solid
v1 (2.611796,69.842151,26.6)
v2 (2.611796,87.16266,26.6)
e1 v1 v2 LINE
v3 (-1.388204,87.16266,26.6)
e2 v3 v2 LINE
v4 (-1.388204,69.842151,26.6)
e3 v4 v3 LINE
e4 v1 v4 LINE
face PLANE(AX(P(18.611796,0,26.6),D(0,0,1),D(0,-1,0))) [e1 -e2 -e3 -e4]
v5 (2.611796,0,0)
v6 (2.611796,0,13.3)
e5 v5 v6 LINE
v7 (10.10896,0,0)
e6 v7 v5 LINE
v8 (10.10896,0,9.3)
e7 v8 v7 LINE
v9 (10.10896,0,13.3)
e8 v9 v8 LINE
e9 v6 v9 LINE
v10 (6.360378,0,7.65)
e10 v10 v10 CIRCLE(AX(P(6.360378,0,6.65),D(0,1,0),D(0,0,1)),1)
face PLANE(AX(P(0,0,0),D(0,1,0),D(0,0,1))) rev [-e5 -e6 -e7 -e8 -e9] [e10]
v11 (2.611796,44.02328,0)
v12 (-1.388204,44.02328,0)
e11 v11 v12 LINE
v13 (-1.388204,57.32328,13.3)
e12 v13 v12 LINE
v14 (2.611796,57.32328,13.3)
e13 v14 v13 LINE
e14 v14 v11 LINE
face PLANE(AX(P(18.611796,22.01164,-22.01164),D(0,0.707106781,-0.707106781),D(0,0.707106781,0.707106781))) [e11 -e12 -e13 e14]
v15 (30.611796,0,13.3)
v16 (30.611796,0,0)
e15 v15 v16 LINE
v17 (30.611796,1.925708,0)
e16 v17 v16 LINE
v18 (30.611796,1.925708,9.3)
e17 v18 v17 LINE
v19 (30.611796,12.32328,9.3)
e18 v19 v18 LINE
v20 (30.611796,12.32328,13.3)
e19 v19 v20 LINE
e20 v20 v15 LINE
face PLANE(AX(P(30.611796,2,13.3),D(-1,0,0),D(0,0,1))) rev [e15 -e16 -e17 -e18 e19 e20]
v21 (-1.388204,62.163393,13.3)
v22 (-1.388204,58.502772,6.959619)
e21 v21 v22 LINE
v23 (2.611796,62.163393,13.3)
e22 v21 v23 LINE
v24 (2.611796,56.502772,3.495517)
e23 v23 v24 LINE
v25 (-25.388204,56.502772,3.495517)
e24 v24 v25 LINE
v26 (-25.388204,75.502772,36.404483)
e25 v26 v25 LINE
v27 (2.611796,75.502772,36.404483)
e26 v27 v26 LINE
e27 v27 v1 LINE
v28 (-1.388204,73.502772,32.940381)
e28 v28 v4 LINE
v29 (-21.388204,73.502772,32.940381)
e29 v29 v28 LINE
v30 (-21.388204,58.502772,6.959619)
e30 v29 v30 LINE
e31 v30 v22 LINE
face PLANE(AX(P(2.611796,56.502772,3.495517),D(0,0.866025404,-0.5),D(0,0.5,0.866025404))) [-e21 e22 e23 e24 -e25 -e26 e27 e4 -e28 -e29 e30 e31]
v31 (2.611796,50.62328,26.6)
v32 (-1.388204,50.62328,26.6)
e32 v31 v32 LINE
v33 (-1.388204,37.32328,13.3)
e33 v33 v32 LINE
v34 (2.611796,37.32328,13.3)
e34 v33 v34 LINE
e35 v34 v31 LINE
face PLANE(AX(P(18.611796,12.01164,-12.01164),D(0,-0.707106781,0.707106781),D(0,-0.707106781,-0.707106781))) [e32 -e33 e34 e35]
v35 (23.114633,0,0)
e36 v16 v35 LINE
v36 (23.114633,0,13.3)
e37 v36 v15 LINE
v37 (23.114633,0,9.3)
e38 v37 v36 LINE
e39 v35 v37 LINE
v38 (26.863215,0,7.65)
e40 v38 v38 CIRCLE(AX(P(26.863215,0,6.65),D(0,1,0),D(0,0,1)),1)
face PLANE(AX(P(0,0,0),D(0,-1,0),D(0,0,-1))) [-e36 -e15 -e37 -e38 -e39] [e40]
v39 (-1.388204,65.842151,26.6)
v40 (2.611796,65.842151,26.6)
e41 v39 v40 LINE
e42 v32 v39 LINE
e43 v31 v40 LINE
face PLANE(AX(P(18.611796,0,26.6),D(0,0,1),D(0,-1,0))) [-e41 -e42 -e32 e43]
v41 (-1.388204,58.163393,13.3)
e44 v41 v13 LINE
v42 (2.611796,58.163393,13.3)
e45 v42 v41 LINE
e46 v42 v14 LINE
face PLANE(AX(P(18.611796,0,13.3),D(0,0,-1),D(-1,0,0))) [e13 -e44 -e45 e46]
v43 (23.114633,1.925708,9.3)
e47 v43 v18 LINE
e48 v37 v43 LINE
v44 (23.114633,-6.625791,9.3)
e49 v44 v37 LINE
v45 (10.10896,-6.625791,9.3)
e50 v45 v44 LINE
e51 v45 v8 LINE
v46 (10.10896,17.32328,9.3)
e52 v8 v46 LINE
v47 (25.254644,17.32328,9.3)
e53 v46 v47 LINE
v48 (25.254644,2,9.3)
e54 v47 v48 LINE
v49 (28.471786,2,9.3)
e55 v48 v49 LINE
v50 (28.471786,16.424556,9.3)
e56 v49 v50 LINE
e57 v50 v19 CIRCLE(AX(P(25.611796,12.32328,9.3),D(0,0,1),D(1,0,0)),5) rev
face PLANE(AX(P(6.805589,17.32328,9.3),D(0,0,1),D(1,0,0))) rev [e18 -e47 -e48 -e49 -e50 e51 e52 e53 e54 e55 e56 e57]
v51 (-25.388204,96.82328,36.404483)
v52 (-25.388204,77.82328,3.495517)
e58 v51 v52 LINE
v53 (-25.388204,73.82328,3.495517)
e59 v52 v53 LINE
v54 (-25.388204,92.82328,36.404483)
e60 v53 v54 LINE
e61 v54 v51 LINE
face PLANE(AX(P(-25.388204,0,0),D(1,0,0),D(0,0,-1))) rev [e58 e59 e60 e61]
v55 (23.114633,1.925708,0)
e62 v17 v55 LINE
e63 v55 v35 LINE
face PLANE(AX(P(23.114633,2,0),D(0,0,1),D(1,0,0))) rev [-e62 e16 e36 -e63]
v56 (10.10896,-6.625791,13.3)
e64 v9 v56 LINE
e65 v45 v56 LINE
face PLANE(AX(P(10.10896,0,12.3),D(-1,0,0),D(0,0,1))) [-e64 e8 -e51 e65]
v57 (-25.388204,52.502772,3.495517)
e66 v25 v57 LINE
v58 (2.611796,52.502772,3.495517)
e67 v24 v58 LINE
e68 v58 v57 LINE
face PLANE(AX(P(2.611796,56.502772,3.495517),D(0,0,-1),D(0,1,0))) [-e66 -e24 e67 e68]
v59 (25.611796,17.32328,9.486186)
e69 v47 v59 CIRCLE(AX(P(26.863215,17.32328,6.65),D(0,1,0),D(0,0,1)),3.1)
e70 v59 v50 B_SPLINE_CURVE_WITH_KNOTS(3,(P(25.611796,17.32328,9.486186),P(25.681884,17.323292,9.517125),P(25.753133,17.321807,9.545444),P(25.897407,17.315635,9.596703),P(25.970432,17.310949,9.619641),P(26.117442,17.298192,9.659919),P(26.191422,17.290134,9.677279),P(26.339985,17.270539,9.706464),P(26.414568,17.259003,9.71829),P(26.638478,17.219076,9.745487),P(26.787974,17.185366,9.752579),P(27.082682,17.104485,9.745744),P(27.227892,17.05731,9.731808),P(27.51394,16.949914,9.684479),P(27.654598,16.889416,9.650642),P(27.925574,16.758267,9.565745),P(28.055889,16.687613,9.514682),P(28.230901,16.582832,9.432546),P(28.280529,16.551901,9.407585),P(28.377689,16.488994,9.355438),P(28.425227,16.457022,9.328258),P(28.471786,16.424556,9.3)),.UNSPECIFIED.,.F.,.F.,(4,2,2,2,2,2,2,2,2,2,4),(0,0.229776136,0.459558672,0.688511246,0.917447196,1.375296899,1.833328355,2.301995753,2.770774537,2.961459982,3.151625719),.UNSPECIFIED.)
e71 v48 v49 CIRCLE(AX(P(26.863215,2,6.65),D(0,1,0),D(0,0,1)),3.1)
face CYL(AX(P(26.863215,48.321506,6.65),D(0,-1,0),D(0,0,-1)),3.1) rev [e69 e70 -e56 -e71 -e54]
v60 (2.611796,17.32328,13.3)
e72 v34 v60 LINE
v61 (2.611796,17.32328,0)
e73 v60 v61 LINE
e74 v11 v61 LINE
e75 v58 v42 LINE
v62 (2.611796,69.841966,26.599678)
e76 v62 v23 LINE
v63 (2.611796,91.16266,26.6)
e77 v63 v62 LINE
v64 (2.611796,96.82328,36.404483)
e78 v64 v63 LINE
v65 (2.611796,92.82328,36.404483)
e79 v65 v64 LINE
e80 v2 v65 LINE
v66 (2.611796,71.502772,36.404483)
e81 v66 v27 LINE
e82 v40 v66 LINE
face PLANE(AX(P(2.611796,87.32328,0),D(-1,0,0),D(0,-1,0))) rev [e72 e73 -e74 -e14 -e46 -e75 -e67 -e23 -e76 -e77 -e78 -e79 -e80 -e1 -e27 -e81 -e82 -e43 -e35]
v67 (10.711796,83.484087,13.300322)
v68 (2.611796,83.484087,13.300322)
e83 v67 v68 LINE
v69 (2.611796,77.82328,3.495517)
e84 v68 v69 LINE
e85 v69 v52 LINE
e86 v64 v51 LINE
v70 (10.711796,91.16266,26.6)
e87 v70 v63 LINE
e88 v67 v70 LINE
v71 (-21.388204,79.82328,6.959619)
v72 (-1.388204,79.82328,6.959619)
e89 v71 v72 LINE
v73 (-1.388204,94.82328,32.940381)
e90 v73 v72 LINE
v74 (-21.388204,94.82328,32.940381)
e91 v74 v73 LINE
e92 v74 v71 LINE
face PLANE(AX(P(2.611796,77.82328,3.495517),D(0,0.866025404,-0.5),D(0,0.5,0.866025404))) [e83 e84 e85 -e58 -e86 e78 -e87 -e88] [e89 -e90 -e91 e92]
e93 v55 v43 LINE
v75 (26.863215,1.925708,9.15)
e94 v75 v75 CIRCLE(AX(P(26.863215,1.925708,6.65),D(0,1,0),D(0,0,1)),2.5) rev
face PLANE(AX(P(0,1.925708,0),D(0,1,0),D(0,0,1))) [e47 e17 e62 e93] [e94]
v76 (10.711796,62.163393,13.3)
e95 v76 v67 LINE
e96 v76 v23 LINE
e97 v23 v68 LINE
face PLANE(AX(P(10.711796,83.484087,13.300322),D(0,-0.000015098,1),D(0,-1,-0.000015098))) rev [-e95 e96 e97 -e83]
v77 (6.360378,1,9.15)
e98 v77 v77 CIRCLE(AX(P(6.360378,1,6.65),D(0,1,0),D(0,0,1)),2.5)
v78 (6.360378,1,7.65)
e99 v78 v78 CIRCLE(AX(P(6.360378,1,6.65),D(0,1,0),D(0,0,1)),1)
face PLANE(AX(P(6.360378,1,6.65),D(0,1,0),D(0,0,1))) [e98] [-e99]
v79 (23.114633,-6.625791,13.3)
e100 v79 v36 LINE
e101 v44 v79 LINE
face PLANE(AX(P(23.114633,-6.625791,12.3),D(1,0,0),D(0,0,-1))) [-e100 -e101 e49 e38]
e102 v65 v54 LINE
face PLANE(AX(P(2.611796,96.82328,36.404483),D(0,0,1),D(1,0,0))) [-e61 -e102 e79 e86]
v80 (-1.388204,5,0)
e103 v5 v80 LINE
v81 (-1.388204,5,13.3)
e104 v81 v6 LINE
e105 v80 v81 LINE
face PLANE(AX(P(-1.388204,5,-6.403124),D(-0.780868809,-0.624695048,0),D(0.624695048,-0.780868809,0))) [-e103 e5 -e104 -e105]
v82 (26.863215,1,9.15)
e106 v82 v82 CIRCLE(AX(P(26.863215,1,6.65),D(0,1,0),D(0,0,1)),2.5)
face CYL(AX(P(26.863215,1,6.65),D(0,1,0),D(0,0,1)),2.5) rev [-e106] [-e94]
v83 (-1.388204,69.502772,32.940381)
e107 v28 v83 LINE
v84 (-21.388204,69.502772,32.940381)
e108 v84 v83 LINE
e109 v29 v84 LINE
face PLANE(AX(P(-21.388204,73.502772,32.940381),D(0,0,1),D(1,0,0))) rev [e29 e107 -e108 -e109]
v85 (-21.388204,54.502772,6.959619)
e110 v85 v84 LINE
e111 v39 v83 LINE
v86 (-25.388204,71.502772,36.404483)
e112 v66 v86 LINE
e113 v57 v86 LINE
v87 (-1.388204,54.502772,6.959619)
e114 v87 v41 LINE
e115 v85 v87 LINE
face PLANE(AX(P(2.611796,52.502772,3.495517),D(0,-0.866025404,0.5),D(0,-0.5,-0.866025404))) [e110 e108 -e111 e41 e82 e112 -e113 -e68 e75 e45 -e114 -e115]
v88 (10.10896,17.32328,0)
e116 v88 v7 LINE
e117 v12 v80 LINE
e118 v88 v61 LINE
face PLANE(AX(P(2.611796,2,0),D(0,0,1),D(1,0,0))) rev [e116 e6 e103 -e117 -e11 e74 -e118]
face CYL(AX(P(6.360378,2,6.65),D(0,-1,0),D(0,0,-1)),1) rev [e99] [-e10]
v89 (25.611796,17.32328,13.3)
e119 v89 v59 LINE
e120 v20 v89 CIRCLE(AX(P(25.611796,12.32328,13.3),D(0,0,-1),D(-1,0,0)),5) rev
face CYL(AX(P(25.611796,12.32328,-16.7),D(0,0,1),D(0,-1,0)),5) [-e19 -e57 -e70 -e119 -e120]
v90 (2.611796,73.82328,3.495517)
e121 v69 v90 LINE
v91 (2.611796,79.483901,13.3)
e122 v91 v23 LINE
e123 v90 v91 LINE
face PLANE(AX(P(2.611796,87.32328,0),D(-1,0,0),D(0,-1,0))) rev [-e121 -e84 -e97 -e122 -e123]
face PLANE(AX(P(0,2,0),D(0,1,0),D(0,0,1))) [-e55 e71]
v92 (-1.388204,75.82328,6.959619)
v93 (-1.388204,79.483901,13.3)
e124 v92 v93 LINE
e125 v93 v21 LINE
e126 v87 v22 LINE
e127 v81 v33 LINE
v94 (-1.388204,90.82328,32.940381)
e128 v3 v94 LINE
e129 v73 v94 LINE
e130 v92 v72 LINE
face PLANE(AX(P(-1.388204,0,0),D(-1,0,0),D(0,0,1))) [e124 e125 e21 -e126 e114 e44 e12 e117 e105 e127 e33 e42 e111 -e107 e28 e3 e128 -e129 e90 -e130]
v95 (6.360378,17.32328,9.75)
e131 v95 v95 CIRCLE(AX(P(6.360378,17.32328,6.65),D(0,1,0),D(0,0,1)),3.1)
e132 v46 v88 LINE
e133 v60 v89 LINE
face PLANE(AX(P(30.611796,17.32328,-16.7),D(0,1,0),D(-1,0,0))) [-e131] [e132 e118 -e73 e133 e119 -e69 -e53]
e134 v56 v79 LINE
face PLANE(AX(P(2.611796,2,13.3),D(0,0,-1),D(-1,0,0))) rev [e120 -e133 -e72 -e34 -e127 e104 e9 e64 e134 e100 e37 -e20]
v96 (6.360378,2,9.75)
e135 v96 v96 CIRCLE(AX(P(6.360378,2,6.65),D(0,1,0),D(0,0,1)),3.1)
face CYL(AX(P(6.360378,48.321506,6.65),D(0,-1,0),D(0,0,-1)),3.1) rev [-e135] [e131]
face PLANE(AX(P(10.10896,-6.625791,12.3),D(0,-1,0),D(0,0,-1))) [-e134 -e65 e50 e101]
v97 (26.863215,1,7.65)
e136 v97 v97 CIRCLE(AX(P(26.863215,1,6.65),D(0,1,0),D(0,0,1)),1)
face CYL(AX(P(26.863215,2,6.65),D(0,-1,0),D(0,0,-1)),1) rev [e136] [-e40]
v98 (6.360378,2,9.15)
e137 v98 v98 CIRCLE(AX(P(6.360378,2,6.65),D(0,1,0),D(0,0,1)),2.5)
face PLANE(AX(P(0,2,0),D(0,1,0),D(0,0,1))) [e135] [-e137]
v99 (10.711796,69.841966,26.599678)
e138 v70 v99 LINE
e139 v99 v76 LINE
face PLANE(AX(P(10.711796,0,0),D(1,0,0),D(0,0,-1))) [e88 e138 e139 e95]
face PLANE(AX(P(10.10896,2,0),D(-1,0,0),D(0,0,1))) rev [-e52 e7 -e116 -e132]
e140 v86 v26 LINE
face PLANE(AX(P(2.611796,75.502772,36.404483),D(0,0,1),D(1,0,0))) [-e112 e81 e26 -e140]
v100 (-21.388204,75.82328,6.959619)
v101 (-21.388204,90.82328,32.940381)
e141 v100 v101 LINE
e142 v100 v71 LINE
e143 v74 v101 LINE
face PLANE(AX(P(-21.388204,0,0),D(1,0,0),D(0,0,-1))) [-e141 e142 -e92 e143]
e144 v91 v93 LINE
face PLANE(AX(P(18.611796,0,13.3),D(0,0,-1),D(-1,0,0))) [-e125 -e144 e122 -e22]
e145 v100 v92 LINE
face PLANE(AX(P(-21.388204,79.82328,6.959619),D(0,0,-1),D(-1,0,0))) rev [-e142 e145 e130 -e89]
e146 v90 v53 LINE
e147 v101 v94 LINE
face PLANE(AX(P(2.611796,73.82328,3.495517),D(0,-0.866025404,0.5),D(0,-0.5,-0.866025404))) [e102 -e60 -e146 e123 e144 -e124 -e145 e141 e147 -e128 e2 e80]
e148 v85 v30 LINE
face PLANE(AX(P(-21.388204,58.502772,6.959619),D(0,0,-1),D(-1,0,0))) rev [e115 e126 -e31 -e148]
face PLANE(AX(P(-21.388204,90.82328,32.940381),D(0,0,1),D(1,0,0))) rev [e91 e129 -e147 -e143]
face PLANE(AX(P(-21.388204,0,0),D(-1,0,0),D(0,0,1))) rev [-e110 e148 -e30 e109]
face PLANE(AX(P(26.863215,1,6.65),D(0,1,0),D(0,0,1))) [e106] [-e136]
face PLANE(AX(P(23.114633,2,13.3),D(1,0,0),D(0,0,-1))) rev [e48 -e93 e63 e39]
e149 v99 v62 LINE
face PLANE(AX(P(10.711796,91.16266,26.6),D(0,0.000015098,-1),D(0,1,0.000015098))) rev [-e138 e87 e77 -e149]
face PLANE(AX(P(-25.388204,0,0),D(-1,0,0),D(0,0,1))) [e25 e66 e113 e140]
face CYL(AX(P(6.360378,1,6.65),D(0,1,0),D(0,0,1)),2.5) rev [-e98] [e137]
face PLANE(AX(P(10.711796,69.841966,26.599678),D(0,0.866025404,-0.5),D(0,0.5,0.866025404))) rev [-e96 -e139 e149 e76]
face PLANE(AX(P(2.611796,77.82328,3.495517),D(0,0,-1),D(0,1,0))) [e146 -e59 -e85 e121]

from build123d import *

# Parameters (mm, degrees)
SKETCH1_W             = 7.497163216
SKETCH1_H             = 13.3
SKETCH1_R             = 1
BOSS_EXTRUDE1_DEPTH   = 2
BOSS_EXTRUDE1_2_DEPTH = 2
SKETCH3_R             = 2.5
CUT_EXTRUDE1_DEPTH    = 1
BOSS_EXTRUDE3_DEPTH   = 1
SKETCH5_R             = 3.1
BOSS_EXTRUDE4_DEPTH   = 15.323280282
CUT_EXTRUDE2_REACH    = 37.51
SKETCH6_W             = 9.3
SKETCH6_H             = 13.397572085
BOSS_EXTRUDE5_START   = -13.397572085
BOSS_EXTRUDE5_DEPTH   = 13.397572085
SKETCH8_W             = 13.005673568
SKETCH8_H             = 3
BOSS_EXTRUDE6_DEPTH   = 10.5515
SKETCH9_W             = 13.3
SKETCH9_H             = 12.323280282
BOSS_EXTRUDE7_DEPTH   = 4
SKETCH10_W            = 4
SKETCH10_H            = 13.3
BOSS_EXTRUDE8_DEPTH   = 70
BOSS_EXTRUDE9_DEPTH   = 13.3
SKETCH15_W            = 4
SKETCH15_H            = 20
BOSS_EXTRUDE13_DEPTH  = 20
SKETCH16_W            = 4
SKETCH16_H            = 20
BOSS_EXTRUDE14_DEPTH  = 30
CUT_EXTRUDE3_DEPTH    = 20
BOSS_EXTRUDE15_DEPTH  = 4
BOSS_EXTRUDE16_DEPTH  = 20
SKETCH21_W            = 7.497163216
SKETCH21_H            = 9.3
CUT_EXTRUDE4_DEPTH    = 2
BOSS_EXTRUDE18_DEPTH  = 4
CUT_EXTRUDE5_DEPTH    = 4
BOSS_EXTRUDE20_DEPTH  = 8.1
FILLET1_R             = 5


with BuildPart() as part:
    # Sketch1 → Boss-Extrude1 (new body)
    with BuildSketch(Plane(origin=(0, 0, 0), x_dir=(1, 0, 0), z_dir=(0, 1, 0))):
        with Locations((6.360378056, -6.65)):
            Rectangle(SKETCH1_W, SKETCH1_H)
        with Locations(Location((6.360378056, -6.65, 0), (0, 0, 270))):
            Circle(SKETCH1_R, mode=Mode.SUBTRACT)
    extrude(amount=BOSS_EXTRUDE1_DEPTH)


with BuildPart() as body_2:
    # Sketch1 → Boss-Extrude1 2 (new body)
    with BuildSketch(Plane(origin=(0, 0, 0), x_dir=(1, 0, 0), z_dir=(0, 1, 0))):
        with Locations((26.86321484, -6.65)):
            Rectangle(SKETCH1_W, SKETCH1_H)
        with Locations(Location((26.86321484, -6.65, 0), (0, 0, 270))):
            Circle(SKETCH1_R, mode=Mode.SUBTRACT)
    extrude(amount=BOSS_EXTRUDE1_2_DEPTH)


with BuildPart() as cut_extrude1_tool:
    # Sketch3 → Cut-Extrude1 (new body)
    with BuildSketch(Plane(origin=(0, 2, 0), x_dir=(1, 0, 0), z_dir=(0, 1, 0))):
        with Locations(Location((26.86321484, -6.65, 0), (0, 0, 270))):
            Circle(SKETCH3_R)
        with Locations(Location((6.360378056, -6.65, 0), (0, 0, 270))):
            Circle(SKETCH3_R)
    extrude(amount=-CUT_EXTRUDE1_DEPTH)


with BuildPart() as part_1:
    add(part.part)

    # Cut-Extrude1: cut by cut_extrude1_tool
    add(cut_extrude1_tool.part, mode=Mode.SUBTRACT)



with BuildPart() as body_2_1:
    add(body_2.part)

    # Cut-Extrude1: cut by cut_extrude1_tool
    add(cut_extrude1_tool.part, mode=Mode.SUBTRACT)


with BuildPart() as part_2:
    add(part_1.part)

    add(body_2_1.part)  # Boss-Extrude3 merges body 2
    # Sketch4 → Boss-Extrude3 (add)
    with BuildSketch(Plane.XY.offset(13.3)):
        Polygon((10.108959664, 0), (10.108959664, -6.625791341), (23.114633232, -6.625791341), (23.114633232, 2), (10.108959664, 2), align=None)
    extrude(amount=-BOSS_EXTRUDE3_DEPTH)

    # Sketch5 → Boss-Extrude4 (add)
    with BuildSketch(Plane(origin=(0, 2, 0), x_dir=(1, 0, 0), z_dir=(0, 1, 0))):
        Polygon((10.108959664, 0), (2.611796448, 0), (2.611796448, -4), (2.611796448, -9.3), (2.611796448, -12.3), (2.611796448, -13.3), (30.611796448, -13.3), (30.611796448, -12.3), (30.611796448, -9.3), (30.611796448, -4), (30.611796448, 0), (23.114633232, 0), (23.114633232, -4), (23.114633232, -9.3), (23.114633232, -12.3), (10.108959664, -12.3), (10.108959664, -9.3), (10.108959664, -4), align=None)
        with Locations(Location((6.360378056, -6.65, 0), (0, 0, 270))):
            Circle(SKETCH5_R, mode=Mode.SUBTRACT)
        with Locations(Location((26.86321484, -6.65, 0), (0, 0, 270))):
            Circle(SKETCH5_R, mode=Mode.SUBTRACT)
    extrude(amount=BOSS_EXTRUDE4_DEPTH)

    # Cut-Extrude2: up to this face of the body (flat: up to its plane)
    cut_extrude2_end = Plane(part_2.part.faces().sort_by_distance((23.114633232, 8.661640141, 6.15))[0])
    # Sketch6 → Cut-Extrude2 (cut, up to the picked face)
    with BuildSketch(Plane(origin=(30.611796448, 0, 0), x_dir=(0, 0, -1), z_dir=(1, 0, 0)), mode=Mode.PRIVATE) as cut_extrude2_sk1:
        with Locations((-4.65, 10.62449424)):
            Rectangle(SKETCH6_W, SKETCH6_H)
    cut_extrude2_tool1 = split(extrude(cut_extrude2_sk1.sketch, amount=-CUT_EXTRUDE2_REACH, mode=Mode.PRIVATE), bisect_by=cut_extrude2_end, keep=Keep.BOTH, mode=Mode.PRIVATE)
    add(cut_extrude2_tool1.solids().sort_by(Axis((30.611796, 10.624494, 4.65), (-1, 0, 0)))[0], mode=Mode.SUBTRACT)

    # Sketch7 → Boss-Extrude5 (add)
    with BuildSketch(Plane(origin=(0, 17.323280282, 0), x_dir=(1, 0, 0), z_dir=(0, 1, 0)).offset(BOSS_EXTRUDE5_START)):
        with BuildLine():
            Line((28.471785634, -9.3), (30.611796448, -9.3))
            Line((30.611796448, -9.3), (30.611796448, -13.3))
            Line((30.611796448, -13.3), (10.108959664, -13.3))
            Line((10.108959664, -13.3), (10.108959664, -9.3))
            Line((10.108959664, -9.3), (25.254644046, -9.3))
            ThreePointArc((25.254644046, -9.3), (26.86321484, -9.75), (28.471785634, -9.3))
        make_face()
    extrude(amount=BOSS_EXTRUDE5_DEPTH)

    # Sketch8 → Boss-Extrude6 (add, through all)
    with BuildSketch(Plane.XZ.offset(-3.925708197)):
        with Locations((16.611796448, 10.8)):
            Rectangle(SKETCH8_W, SKETCH8_H)
    extrude(amount=BOSS_EXTRUDE6_DEPTH)

    # Sketch9 → Boss-Extrude7 (add)
    with BuildSketch(Plane.ZY.offset(-2.611796448)):
        with Locations((6.65, 11.161640141)):
            Rectangle(SKETCH9_W, SKETCH9_H)
    extrude(amount=BOSS_EXTRUDE7_DEPTH)

    # Sketch10 → Boss-Extrude8 (add)
    with BuildSketch(Plane(origin=(0, 17.323280282, 0), x_dir=(1, 0, 0), z_dir=(0, 1, 0))):
        with Locations((0.611796448, -6.65)):
            Rectangle(SKETCH10_W, SKETCH10_H)
    extrude(amount=BOSS_EXTRUDE8_DEPTH)

    # Sketch11 → Boss-Extrude9 (add)
    with BuildSketch(Plane.XY.offset(13.3)):
        Polygon((-1.388203552, 5), (2.611796448, 0), (2.611796448, 5), align=None)
    extrude(amount=-BOSS_EXTRUDE9_DEPTH)

    # Sketch15 → Boss-Extrude13 (add)
    with BuildSketch(Plane.XY.offset(13.3)):
        with Locations((0.611796448, 47.323280282)):
            Rectangle(SKETCH15_W, SKETCH15_H)
    extrude(amount=BOSS_EXTRUDE13_DEPTH)

    # Sketch16 → Boss-Extrude14 (add)
    with BuildSketch(Plane(origin=(0, 57.323280282, 0), x_dir=(1, 0, 0), z_dir=(0, 1, 0))):
        with Locations((0.611796448, -23.3)):
            Rectangle(SKETCH16_W, SKETCH16_H)
    extrude(amount=BOSS_EXTRUDE14_DEPTH)

    # Sketch17 → Cut-Extrude3 (cut)
    with BuildSketch(Plane.ZY.offset(1.388203552)):
        Polygon((13.3, 87.323280282), (0, 87.323280282), (0, 57.323280282), (0, 44.023280282), (13.3, 57.323280282), align=None)
        Polygon((33.3, 87.323280282), (26.6, 87.323280282), (26.6, 50.623280282), (13.3, 37.323280282), (26.6, 37.323280282), (33.3, 37.323280282), align=None)
    extrude(amount=-CUT_EXTRUDE3_DEPTH, mode=Mode.SUBTRACT)

    # Sketch18 → Boss-Extrude15 (add)
    with BuildSketch(Plane.ZY.offset(1.388203552)):
        Polygon((3.495517328, 77.823280282), (36.404482672, 96.823280282), (36.404482672, 92.823280282), (3.495517328, 73.823280282), align=None)
        Polygon((3.495517328, 56.502772207), (36.404482672, 75.502772207), (36.404482672, 71.502772207), (3.495517328, 52.502772207), align=None)
    extrude(amount=-BOSS_EXTRUDE15_DEPTH)

    # Sketch19 → Boss-Extrude16 (add)
    with BuildSketch(Plane.ZY.offset(1.388203552)):
        Polygon((3.495517328, 77.823280282), (6.959618943, 79.823280282), (6.959618943, 75.823280282), (3.495517328, 73.823280282), align=None)
        Polygon((3.495517328, 56.502772207), (6.959618943, 58.502772207), (6.959618943, 54.502772207), (3.495517328, 52.502772207), align=None)
        Polygon((36.404482672, 75.502772207), (32.940381057, 73.502772207), (32.940381057, 69.502772207), (36.404482672, 71.502772207), align=None)
        Polygon((36.404482672, 92.823280282), (32.940381057, 90.823280282), (32.940381057, 94.823280282), (36.404482672, 96.823280282), align=None)
    extrude(amount=BOSS_EXTRUDE16_DEPTH)

    # Sketch21 → Cut-Extrude4 (cut)
    with BuildSketch(Plane(origin=(0, 3.925708197, 0), x_dir=(1, 0, 0), z_dir=(0, 1, 0))):
        with Locations((26.86321484, -4.65)):
            Rectangle(SKETCH21_W, SKETCH21_H)
    extrude(amount=-CUT_EXTRUDE4_DEPTH, mode=Mode.SUBTRACT)

    # Sketch22 → Boss-Extrude18 (add)
    with BuildSketch(Plane.ZY.offset(21.388203552)):
        Polygon((3.495517328, 77.823280282), (36.404482672, 96.823280282), (36.404482672, 92.823280282), (3.495517328, 73.823280282), align=None)
        Polygon((3.495517328, 56.502772207), (3.495517328, 52.502772207), (36.404482672, 71.502772207), (36.404482672, 75.502772207), align=None)
    extrude(amount=BOSS_EXTRUDE18_DEPTH)

    # Sketch23 → Cut-Extrude5 (cut)
    with BuildSketch(Plane(origin=(2.611796448, 0, 0), x_dir=(0, 0, -1), z_dir=(1, 0, 0))):
        Polygon((-13.3, 87.323280282), (-13.3, 83.483900992), (-19.95, 87.323280282), align=None)
    extrude(amount=-CUT_EXTRUDE5_DEPTH, mode=Mode.SUBTRACT)

    # Sketch24 → Boss-Extrude20 (add)
    with BuildSketch(Plane(origin=(2.611796448, 0, 0), x_dir=(0, 0, -1), z_dir=(1, 0, 0))):
        Polygon((-26.6, 91.162659572), (-13.300321898, 83.48408684), (-13.3, 62.163392916), (-26.599678102, 69.841965649), align=None)
    extrude(amount=BOSS_EXTRUDE20_DEPTH)

    # Fillet1
    # the kernel refuses this fillet: 5 mm, written as the material it takes off along each edge
    with BuildSketch(Plane(origin=(30.611796448, 17.323280282, -3.2), x_dir=(-1, 0, 0), z_dir=(0, 0, 1))) as fillet1_piece_1:
        with BuildLine():
            CenterArc((FILLET1_R, FILLET1_R), FILLET1_R, 180, 90)
            Line((0, FILLET1_R), (0, 0))
            Line((0, 0), (FILLET1_R, 0))
        make_face()
    extrude(amount=29, mode=Mode.SUBTRACT)


solid = part_2.part
